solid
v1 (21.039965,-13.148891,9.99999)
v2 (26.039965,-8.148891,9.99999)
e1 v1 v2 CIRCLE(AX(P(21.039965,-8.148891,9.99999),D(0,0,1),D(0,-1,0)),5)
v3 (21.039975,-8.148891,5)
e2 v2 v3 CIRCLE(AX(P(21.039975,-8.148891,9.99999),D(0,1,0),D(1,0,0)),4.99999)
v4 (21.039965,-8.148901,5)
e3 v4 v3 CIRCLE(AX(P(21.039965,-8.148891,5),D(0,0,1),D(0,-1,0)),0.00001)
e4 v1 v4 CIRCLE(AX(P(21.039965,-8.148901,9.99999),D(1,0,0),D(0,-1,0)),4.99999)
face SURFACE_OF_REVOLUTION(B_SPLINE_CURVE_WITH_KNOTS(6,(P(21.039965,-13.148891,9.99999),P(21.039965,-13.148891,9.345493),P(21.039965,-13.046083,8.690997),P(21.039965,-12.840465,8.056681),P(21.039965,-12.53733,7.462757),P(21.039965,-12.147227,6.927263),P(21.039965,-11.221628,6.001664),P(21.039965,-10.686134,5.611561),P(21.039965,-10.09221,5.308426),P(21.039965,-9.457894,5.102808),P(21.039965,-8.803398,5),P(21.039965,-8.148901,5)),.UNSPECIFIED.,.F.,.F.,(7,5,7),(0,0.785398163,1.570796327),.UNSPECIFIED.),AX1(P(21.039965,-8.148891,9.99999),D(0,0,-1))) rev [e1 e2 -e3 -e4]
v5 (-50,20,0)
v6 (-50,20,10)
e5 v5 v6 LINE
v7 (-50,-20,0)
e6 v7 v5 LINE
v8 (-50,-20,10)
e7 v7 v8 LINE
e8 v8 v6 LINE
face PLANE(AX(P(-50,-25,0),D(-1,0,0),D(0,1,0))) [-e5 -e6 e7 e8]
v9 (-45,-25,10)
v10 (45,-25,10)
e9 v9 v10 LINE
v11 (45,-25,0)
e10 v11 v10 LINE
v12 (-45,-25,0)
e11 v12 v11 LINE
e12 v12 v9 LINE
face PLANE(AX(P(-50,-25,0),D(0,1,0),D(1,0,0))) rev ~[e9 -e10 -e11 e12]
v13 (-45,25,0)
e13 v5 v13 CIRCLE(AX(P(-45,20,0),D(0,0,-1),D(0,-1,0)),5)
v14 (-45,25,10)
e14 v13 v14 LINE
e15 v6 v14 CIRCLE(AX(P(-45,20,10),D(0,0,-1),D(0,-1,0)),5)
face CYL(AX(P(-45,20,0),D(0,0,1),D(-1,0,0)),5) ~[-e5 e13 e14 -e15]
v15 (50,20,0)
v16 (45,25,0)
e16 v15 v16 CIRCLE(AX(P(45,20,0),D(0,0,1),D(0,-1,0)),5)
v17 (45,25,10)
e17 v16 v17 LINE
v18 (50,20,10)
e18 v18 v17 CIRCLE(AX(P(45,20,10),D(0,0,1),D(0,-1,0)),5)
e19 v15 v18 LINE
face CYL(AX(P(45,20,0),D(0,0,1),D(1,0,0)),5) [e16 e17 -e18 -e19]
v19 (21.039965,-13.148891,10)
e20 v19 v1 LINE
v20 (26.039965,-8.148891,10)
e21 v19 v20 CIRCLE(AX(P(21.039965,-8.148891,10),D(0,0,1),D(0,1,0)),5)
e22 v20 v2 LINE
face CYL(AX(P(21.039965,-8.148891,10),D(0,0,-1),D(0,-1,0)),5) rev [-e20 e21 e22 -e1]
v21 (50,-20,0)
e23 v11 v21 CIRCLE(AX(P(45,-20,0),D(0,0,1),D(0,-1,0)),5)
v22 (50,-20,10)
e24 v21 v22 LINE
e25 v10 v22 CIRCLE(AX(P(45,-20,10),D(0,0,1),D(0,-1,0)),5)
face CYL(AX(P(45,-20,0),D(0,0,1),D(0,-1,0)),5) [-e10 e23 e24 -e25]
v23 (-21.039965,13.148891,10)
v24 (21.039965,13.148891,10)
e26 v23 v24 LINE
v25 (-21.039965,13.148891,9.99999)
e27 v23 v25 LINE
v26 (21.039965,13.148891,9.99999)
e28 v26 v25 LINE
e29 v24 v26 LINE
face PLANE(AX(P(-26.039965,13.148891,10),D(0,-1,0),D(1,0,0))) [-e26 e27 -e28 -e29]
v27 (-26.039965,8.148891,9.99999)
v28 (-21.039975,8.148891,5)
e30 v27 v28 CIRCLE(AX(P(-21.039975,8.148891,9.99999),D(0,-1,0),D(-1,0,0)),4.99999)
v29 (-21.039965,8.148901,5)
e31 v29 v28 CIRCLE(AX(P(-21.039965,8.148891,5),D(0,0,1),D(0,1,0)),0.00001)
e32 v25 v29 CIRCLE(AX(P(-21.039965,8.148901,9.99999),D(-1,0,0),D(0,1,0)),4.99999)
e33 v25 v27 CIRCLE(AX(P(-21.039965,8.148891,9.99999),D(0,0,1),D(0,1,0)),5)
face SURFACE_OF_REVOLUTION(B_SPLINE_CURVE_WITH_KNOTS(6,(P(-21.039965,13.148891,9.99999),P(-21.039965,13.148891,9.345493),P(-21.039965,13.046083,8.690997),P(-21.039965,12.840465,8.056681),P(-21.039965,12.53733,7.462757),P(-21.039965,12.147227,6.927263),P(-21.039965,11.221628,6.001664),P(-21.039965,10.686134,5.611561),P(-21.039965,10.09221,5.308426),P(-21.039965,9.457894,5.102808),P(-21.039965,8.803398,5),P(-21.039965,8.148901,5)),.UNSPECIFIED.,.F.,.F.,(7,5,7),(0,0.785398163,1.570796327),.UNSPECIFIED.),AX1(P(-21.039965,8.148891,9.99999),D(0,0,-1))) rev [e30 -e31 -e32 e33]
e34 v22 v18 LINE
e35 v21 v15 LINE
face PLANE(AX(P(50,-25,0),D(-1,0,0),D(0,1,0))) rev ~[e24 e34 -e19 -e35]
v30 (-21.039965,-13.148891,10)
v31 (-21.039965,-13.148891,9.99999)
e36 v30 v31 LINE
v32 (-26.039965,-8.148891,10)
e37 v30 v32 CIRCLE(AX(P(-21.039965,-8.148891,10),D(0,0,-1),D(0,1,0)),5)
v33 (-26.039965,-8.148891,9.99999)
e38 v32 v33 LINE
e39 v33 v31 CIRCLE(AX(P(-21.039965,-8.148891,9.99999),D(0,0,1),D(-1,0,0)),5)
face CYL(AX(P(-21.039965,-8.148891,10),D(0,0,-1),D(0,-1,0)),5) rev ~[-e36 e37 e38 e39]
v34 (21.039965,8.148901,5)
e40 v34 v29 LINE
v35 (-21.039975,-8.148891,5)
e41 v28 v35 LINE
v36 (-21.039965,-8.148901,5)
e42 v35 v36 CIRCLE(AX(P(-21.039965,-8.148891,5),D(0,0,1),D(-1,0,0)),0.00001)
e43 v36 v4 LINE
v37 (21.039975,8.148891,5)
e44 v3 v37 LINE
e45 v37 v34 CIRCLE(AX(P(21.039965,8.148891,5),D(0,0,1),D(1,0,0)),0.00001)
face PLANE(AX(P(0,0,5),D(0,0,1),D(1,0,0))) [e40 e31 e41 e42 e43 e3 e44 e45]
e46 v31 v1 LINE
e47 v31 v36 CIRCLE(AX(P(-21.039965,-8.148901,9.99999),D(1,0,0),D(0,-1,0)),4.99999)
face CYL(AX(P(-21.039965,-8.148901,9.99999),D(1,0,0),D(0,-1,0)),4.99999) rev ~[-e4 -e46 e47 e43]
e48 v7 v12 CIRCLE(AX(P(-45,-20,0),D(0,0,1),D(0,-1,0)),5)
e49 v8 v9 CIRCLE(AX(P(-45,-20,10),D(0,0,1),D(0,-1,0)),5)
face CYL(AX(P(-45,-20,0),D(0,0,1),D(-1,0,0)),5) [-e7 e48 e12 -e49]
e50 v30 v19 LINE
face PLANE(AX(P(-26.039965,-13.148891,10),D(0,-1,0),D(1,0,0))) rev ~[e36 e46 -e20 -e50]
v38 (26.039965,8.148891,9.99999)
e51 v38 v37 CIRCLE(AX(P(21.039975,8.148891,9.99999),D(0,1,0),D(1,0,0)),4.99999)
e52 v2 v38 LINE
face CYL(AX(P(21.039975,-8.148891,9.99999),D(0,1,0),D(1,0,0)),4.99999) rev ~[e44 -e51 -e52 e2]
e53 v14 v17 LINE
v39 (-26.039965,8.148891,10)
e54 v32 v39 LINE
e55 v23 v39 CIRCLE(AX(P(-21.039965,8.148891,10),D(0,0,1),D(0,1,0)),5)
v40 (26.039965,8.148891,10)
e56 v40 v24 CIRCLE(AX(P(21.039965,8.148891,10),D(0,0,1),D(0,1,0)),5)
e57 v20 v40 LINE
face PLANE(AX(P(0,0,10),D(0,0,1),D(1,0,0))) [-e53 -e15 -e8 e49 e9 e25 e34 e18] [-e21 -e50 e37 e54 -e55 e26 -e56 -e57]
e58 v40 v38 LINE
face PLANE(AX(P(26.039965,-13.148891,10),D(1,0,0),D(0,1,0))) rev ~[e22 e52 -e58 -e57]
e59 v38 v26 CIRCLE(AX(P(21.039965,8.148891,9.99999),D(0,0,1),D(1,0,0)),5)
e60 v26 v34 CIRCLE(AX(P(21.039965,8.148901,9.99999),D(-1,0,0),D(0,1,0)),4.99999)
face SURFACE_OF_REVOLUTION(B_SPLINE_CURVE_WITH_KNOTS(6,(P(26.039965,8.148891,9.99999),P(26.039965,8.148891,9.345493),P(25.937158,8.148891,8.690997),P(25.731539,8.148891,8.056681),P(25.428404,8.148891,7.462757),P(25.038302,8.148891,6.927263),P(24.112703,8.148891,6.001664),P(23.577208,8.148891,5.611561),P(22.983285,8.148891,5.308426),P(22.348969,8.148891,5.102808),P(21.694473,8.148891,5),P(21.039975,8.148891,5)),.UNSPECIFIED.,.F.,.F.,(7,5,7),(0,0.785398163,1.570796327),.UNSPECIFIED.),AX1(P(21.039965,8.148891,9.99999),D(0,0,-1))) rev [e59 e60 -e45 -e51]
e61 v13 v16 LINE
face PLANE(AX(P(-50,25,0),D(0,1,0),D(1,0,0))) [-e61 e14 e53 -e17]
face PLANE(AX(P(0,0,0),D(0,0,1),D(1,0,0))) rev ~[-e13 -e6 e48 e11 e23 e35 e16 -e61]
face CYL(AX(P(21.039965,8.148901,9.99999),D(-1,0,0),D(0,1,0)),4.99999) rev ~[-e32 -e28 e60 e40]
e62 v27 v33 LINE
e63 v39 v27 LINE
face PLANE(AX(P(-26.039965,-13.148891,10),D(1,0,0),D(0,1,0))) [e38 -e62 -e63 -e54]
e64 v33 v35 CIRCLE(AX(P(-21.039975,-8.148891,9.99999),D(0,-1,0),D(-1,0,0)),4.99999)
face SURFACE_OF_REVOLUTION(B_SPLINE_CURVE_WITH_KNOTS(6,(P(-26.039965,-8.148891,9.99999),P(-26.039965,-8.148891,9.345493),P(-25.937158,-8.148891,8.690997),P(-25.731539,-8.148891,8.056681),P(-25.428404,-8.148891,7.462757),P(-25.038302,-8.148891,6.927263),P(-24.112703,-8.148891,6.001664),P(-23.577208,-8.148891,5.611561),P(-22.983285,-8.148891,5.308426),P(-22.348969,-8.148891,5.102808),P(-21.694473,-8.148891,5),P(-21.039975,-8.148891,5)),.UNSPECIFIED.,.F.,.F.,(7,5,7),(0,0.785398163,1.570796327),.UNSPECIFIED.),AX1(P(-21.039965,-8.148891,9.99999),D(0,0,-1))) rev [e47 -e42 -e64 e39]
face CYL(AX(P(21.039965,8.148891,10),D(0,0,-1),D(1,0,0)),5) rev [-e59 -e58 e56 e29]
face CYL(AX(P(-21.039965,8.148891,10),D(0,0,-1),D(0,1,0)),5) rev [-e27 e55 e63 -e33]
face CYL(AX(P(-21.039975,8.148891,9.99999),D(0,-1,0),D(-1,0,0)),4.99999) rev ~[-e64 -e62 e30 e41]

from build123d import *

# Parameters (mm, degrees)
F0_W     = 100
F0_H     = 50
F1_DEPTH = 10
F2_R     = 5
F3_W     = 52.0799309015
F3_H     = 26.2977816164
F4_DEPTH = 5
F5_R     = 5
F6_R     = 4.99999


# Not quite as in the source:
# - a fillet or chamfer is up to 0.001 mm smaller than in the source, because OpenCascade refuses the exact size


with BuildPart() as f1:
    # F0 (on Top) → F1 (new body)
    with BuildSketch(Plane.XY):
        Rectangle(F0_W, F0_H)
    extrude(amount=F1_DEPTH)

    # F2
    f2_edges = [f1.edges().sort_by_distance(p)[0] for p in [
        (-50, -25, 5),
        (-50, 25, 5),
        (50, -25, 5),
        (50, 25, 5),
    ]]
    fillet(f2_edges, radius=F2_R)

    # F3 (on face) → F4 (cut)
    with BuildSketch(Plane.XY.offset(10)):
        Rectangle(F3_W, F3_H)
    extrude(amount=-F4_DEPTH, mode=Mode.SUBTRACT)

    # F5
    f5_edges = [f1.edges().sort_by_distance(p)[0] for p in [
        (-26.039965, 13.148891, 7.5),
        (26.039965, 13.148891, 7.5),
        (26.039965, -13.148891, 7.5),
        (-26.039965, -13.148891, 7.5),
    ]]
    fillet(f5_edges, radius=F5_R)

    # F6 (radius 5 in the source; OpenCascade refuses exactly that, so slightly less here)
    f6_edges = [f1.edges().sort_by_distance(p)[0] for p in [
        (0, -13.148891, 5),
        (-24.575499, -11.684425, 5),
        (24.575499, -11.684425, 5),
        (-26.039965, 0, 5),
        (26.039965, 0, 5),
        (-24.575499, 11.684425, 5),
        (24.575499, 11.684425, 5),
        (0, 13.148891, 5),
    ]]
    fillet(f6_edges, radius=F6_R)


solid = f1.part
